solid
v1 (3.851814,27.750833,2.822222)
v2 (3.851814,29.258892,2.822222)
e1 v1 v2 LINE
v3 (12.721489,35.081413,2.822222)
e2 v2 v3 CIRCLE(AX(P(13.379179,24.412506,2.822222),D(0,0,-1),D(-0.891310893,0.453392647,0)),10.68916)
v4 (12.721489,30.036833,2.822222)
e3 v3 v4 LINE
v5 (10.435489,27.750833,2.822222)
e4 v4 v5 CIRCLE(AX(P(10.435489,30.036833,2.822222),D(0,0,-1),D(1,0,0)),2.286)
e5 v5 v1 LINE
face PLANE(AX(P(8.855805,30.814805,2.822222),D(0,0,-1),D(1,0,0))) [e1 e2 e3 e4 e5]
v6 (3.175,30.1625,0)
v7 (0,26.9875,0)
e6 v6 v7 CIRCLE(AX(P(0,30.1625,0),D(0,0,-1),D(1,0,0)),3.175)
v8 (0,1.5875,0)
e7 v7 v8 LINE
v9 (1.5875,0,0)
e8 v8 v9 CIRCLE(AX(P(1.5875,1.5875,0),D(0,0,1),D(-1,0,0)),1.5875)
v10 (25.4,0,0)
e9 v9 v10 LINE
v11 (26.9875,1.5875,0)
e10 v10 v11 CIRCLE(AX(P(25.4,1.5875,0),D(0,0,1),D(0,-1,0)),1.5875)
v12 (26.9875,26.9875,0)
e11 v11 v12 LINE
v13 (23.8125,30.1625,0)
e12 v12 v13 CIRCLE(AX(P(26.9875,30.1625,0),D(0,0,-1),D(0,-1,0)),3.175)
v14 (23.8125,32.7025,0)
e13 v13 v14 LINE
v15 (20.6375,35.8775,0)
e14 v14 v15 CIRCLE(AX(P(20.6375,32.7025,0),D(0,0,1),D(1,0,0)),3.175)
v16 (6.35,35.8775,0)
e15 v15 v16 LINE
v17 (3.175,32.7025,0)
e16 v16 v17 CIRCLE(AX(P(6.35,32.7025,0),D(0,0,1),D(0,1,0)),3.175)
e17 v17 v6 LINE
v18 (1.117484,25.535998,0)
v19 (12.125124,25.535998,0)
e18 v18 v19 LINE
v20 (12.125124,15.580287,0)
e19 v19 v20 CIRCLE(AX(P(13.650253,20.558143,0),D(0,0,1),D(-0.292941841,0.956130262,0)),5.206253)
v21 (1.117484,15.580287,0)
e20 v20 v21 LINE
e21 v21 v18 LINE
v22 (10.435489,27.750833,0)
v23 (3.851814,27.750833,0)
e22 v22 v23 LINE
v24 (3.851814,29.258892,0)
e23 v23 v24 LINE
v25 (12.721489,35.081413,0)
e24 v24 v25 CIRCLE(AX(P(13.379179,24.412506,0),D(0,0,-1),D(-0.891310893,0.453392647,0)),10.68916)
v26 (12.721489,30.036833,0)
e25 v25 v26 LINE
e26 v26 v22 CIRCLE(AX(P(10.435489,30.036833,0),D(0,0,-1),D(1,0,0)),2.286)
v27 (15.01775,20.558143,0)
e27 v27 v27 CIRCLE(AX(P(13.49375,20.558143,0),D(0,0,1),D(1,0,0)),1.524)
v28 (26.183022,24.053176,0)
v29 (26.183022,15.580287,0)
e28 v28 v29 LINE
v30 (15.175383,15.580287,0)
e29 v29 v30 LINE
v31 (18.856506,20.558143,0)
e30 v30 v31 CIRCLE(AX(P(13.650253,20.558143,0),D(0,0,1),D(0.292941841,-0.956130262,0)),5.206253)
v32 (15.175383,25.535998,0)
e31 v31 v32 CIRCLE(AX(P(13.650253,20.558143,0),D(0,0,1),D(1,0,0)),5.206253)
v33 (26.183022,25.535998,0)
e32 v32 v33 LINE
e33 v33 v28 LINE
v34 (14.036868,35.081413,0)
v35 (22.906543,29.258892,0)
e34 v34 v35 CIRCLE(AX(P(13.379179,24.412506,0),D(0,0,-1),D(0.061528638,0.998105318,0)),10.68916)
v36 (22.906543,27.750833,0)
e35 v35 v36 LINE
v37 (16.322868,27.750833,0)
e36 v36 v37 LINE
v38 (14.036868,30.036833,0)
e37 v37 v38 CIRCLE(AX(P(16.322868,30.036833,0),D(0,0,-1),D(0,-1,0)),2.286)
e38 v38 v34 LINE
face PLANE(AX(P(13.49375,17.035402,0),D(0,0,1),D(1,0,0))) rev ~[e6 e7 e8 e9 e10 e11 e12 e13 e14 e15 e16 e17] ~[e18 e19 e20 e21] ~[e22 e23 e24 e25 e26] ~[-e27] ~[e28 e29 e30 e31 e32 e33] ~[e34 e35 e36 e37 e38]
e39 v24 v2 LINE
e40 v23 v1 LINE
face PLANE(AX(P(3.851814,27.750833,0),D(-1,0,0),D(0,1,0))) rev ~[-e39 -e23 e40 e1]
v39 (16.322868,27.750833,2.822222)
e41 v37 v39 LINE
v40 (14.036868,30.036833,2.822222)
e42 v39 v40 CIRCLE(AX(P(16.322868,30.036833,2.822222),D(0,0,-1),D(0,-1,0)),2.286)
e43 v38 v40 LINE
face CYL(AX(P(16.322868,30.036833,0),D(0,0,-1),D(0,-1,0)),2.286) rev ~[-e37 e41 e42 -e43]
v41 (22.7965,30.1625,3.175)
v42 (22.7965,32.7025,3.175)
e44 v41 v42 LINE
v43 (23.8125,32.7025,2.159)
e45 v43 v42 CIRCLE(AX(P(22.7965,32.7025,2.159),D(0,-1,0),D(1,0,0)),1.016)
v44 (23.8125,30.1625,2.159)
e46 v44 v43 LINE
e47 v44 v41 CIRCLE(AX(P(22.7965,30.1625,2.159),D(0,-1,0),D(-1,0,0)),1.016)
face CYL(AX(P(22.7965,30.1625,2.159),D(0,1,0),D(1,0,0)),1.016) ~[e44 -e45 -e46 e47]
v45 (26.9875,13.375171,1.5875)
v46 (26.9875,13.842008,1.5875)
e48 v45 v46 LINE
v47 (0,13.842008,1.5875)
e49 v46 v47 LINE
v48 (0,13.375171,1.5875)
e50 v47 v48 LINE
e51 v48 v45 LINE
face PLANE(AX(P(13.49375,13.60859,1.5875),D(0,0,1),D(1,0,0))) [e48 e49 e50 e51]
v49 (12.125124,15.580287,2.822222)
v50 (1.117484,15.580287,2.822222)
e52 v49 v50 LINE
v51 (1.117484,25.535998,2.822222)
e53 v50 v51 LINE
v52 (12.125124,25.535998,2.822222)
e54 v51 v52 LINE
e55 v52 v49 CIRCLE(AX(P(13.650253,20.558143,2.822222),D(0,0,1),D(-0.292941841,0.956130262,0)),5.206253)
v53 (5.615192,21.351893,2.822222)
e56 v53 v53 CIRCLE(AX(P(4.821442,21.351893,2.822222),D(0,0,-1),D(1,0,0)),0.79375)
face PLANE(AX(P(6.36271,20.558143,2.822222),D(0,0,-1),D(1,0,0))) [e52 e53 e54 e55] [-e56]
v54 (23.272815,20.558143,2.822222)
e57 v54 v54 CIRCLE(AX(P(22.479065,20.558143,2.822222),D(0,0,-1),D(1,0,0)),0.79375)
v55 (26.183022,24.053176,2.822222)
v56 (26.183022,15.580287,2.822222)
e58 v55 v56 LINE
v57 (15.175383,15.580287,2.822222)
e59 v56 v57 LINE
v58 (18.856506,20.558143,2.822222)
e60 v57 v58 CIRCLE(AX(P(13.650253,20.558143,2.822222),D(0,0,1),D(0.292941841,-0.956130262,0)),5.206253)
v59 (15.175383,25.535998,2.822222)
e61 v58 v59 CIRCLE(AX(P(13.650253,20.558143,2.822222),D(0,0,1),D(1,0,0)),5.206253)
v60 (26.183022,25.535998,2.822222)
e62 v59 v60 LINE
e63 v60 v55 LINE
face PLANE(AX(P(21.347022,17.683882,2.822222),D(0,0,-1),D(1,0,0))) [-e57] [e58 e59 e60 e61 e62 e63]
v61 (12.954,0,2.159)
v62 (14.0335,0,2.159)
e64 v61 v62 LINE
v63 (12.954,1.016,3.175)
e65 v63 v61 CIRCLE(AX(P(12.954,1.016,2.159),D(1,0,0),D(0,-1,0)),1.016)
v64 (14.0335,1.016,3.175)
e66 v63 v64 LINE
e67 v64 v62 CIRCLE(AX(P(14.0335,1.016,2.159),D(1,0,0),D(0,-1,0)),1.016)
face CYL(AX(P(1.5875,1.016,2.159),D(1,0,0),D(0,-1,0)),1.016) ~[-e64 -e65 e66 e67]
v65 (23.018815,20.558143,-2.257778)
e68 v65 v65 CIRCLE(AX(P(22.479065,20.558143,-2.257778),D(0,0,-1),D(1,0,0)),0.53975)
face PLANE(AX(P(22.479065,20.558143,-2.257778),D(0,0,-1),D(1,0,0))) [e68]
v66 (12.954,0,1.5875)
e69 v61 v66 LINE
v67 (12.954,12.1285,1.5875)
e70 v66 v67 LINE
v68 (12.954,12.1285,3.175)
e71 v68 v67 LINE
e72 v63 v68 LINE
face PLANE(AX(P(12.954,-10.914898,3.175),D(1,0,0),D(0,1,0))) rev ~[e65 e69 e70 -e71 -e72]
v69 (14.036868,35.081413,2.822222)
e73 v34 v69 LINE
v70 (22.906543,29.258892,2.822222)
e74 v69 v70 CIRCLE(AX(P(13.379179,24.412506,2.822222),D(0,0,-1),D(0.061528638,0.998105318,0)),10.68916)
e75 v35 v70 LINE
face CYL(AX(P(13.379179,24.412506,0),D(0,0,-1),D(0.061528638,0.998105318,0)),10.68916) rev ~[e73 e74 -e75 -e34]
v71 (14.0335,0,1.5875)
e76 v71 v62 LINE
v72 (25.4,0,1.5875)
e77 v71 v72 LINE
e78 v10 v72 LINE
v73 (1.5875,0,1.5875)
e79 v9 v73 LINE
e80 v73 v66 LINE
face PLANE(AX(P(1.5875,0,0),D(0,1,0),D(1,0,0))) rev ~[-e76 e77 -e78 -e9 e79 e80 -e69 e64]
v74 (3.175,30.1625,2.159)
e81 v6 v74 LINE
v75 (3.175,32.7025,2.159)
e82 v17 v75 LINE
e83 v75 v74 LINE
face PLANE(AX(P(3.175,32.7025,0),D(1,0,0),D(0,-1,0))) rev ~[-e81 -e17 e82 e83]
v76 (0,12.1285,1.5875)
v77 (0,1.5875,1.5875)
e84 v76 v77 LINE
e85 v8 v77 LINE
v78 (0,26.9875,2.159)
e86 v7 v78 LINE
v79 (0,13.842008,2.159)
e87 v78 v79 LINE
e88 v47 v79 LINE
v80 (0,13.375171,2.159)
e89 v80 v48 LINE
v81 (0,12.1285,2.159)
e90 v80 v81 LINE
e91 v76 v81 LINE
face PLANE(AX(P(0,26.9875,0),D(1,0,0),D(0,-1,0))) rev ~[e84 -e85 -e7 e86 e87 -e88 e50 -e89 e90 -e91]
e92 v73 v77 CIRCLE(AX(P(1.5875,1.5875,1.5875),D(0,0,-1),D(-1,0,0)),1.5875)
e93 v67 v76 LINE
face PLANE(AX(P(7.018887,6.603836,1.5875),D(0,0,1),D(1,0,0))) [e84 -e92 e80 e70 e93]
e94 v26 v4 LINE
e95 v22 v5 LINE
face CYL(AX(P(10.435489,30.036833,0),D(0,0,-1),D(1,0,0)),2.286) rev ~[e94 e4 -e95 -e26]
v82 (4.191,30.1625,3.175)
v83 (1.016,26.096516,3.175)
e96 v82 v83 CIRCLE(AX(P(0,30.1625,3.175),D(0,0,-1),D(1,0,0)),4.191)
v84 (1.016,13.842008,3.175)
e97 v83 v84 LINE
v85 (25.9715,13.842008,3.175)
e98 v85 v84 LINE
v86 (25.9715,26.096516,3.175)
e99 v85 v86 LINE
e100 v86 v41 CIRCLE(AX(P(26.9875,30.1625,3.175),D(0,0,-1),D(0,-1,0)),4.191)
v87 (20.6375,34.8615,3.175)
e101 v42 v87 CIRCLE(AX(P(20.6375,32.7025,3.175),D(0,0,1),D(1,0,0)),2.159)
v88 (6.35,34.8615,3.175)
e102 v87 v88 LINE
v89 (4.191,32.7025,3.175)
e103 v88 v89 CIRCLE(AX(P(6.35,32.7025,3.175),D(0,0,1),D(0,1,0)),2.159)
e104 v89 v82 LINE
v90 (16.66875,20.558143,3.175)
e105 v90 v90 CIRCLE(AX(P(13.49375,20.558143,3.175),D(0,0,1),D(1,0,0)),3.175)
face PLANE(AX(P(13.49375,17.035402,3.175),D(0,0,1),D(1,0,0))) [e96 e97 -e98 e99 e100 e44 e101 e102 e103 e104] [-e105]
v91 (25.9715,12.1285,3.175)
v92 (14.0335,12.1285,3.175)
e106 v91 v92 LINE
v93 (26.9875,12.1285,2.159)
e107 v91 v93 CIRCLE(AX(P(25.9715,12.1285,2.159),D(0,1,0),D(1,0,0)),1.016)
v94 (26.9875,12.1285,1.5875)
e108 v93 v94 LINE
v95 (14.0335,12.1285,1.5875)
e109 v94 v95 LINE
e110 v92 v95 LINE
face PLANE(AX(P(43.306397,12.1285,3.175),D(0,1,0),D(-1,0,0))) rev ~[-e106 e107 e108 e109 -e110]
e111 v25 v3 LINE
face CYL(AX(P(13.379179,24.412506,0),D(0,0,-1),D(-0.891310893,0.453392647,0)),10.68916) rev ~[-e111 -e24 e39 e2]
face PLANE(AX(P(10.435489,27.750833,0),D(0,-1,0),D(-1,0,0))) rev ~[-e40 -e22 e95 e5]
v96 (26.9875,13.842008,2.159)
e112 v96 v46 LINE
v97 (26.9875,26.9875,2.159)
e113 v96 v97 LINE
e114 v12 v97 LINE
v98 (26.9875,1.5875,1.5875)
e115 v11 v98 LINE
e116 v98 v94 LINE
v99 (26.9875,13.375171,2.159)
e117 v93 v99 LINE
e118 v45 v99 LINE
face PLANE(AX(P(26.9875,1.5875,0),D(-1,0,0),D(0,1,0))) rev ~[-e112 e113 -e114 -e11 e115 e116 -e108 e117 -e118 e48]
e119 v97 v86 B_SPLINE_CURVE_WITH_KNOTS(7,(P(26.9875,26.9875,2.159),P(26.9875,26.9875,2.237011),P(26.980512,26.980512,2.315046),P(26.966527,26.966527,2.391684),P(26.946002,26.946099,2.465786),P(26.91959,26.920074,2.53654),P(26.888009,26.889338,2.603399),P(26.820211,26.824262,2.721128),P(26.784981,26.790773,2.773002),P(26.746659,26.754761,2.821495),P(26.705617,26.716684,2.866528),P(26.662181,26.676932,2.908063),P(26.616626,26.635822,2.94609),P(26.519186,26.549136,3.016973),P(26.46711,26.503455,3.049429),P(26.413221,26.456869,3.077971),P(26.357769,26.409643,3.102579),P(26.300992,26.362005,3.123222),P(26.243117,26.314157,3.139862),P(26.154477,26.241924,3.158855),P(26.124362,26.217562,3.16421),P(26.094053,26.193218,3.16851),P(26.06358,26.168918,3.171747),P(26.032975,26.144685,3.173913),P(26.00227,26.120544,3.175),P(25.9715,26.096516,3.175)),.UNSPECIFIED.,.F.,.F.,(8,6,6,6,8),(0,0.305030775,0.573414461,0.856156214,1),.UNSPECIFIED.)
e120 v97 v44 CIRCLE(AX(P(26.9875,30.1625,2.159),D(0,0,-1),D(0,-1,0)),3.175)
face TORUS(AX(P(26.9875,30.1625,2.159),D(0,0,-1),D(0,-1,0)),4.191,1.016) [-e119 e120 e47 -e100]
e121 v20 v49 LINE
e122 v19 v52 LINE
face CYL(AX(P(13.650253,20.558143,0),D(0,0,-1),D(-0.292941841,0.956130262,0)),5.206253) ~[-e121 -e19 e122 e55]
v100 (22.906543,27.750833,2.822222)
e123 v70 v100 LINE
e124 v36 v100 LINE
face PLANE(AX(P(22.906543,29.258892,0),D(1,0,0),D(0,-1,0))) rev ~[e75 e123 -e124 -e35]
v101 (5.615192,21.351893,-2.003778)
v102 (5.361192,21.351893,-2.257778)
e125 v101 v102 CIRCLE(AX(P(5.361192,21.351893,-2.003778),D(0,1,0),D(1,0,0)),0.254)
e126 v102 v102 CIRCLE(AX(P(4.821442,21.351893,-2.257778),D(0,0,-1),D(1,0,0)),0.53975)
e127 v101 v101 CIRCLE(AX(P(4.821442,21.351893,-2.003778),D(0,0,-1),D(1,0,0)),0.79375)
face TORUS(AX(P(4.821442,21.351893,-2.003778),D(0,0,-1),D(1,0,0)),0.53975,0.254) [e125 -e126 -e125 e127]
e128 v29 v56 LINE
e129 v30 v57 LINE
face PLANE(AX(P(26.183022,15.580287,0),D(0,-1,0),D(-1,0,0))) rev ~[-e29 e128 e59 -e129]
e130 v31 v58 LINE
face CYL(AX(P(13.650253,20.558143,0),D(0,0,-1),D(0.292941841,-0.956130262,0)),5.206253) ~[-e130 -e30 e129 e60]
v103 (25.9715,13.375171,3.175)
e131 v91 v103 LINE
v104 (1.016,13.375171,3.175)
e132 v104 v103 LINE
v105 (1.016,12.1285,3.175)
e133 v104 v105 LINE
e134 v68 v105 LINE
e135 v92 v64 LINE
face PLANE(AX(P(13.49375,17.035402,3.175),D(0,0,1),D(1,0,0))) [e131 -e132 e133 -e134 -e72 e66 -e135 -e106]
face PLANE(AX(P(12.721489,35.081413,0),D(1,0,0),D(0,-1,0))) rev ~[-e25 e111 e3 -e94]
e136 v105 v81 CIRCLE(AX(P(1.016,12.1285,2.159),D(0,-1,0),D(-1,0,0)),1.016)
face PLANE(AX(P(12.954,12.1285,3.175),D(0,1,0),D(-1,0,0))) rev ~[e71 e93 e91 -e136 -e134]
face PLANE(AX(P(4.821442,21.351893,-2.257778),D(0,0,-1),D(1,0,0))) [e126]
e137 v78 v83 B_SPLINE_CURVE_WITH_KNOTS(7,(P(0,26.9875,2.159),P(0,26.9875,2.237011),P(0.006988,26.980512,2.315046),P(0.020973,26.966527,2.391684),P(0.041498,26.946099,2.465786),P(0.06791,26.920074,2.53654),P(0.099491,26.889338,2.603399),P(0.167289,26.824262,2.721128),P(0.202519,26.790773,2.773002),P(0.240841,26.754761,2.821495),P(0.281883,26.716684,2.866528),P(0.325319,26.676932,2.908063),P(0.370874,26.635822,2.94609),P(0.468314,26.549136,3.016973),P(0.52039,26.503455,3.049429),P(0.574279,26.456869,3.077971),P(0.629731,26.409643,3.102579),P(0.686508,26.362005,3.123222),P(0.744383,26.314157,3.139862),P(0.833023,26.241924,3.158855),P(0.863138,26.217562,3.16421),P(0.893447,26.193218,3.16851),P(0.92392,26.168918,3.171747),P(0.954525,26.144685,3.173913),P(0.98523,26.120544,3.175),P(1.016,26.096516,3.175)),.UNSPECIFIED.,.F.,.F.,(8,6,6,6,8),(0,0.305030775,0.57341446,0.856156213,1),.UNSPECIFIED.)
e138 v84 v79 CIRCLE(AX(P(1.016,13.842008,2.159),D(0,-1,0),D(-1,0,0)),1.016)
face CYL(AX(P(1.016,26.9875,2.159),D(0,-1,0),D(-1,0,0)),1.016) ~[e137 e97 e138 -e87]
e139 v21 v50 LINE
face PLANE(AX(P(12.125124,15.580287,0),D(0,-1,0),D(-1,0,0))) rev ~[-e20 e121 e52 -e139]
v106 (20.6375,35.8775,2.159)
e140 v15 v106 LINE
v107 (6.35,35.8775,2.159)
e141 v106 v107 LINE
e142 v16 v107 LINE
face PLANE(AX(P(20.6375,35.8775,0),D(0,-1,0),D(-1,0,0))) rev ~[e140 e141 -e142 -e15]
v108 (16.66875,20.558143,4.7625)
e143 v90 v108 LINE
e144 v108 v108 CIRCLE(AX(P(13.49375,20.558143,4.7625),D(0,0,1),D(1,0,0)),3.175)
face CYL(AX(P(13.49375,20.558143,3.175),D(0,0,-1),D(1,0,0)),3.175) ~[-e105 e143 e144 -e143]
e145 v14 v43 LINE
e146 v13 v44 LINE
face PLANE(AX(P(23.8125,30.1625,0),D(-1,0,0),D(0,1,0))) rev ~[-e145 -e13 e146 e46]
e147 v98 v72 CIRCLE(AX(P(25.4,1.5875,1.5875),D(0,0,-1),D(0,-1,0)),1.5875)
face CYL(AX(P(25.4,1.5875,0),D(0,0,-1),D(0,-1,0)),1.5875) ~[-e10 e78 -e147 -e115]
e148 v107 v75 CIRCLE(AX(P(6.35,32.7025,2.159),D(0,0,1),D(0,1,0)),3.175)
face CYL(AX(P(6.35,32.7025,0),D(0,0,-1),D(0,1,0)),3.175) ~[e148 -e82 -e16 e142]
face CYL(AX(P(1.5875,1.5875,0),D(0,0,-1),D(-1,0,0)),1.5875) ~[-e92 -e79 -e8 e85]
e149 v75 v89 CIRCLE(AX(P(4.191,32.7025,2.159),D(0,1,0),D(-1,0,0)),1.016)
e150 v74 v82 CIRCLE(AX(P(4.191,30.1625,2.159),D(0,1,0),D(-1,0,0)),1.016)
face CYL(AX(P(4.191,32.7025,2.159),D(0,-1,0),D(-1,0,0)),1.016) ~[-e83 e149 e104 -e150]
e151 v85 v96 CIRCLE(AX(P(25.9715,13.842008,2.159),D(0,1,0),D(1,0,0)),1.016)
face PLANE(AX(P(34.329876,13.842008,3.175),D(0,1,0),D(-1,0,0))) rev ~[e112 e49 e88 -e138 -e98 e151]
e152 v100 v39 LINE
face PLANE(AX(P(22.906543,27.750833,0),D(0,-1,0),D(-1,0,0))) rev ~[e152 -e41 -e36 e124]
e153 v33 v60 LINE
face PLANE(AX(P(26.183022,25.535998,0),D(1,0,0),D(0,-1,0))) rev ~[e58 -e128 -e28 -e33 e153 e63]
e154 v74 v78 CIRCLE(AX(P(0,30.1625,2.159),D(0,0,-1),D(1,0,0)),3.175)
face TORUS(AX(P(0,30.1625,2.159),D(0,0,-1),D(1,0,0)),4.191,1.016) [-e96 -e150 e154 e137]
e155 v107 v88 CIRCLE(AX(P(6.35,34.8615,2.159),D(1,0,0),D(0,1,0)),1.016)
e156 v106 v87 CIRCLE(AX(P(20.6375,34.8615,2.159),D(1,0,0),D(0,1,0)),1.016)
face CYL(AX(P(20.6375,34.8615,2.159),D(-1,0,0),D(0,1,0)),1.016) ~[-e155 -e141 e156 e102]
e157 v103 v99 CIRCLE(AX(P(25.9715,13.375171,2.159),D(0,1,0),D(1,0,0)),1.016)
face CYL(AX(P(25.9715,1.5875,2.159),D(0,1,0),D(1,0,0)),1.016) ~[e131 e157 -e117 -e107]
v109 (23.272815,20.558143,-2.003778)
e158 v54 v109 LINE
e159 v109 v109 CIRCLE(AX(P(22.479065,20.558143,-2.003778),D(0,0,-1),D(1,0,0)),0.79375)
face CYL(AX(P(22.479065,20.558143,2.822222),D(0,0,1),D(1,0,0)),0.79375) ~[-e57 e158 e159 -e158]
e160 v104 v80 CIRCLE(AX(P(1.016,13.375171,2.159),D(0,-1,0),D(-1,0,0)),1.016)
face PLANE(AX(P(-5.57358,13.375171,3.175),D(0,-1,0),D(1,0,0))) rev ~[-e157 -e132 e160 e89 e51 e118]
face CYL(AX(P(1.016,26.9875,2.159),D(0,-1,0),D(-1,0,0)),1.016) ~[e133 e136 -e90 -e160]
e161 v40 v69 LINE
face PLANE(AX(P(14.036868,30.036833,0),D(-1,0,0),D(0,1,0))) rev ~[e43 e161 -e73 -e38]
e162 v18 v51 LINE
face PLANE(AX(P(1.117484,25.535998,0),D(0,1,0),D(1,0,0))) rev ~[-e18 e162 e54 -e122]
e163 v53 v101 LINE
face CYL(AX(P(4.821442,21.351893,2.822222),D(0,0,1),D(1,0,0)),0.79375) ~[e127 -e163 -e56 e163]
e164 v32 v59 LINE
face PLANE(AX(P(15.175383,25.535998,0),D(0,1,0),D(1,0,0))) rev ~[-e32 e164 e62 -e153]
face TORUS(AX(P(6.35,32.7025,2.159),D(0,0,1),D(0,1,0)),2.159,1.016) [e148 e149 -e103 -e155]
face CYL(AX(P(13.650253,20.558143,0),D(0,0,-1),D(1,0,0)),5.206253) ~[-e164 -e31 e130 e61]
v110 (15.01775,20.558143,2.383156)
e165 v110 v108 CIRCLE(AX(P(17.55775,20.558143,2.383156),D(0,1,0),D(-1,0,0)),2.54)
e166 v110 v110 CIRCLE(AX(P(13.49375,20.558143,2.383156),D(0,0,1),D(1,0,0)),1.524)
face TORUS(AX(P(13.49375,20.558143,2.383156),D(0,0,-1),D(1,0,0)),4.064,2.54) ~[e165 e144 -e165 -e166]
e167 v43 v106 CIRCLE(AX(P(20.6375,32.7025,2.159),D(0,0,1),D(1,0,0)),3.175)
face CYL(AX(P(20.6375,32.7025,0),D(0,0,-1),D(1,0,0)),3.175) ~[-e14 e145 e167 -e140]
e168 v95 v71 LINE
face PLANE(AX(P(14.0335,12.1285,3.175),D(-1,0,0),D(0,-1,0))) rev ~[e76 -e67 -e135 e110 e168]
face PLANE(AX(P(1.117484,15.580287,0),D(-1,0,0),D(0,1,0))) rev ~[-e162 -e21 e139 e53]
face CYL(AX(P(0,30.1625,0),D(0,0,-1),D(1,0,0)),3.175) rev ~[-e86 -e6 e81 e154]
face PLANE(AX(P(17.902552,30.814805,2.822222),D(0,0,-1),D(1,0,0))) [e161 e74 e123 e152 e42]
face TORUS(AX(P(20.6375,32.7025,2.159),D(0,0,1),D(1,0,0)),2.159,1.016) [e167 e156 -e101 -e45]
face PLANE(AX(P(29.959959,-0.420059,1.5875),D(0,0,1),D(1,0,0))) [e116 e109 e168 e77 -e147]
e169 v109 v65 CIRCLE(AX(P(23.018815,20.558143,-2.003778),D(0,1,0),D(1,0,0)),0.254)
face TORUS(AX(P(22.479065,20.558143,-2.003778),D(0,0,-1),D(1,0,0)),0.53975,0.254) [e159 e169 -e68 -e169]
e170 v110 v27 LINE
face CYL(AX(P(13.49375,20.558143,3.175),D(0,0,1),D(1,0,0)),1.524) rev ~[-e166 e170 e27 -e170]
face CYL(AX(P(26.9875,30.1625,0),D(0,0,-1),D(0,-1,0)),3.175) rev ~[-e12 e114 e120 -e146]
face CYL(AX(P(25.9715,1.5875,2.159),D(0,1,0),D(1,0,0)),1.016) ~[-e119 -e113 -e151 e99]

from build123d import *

# Parameters (mm, degrees)
F1_DEPTH  = 3.175
F2_R      = 1.016
F3_W      = 24.9555
F3_H      = 0.4668365944
F3_W_2    = 8.3583763037
F3_W_3    = 6.5895795759
F4_DEPTH  = 1.5875
F5_R      = 1.524
F6_DEPTH  = 25.4
F5_R_2    = 3.175
F7_DEPTH  = 1.5875
F9_W      = 1.294683665
F9_H      = 1.482822001
F10_DEPTH = 2.8222222222
F11_R     = 0.79375
F12_DEPTH = 5.08
F13_R     = 0.254
F15_DEPTH = 2.8222222222


# Not quite as in the source:
# - a fillet or chamfer that OpenCascade refuses, or shapes differently, is made with other operations: its cross-section is extruded or revolved along the edge and cut away or added


with BuildPart() as f1:
    # F0 (on Top) → F1 (new body)
    with BuildSketch(Plane.XY):
        with BuildLine():
            ThreePointArc((0, 1.5875), (0.4649679849, 0.4649679849), (1.5875, 0))
            Line((1.5875, 0), (25.4, 0))
            ThreePointArc((25.4, 0), (26.5225320151, 0.4649679849), (26.9875, 1.5875))
            Line((26.9875, 1.5875), (26.9875, 26.9875))
            ThreePointArc((26.9875, 26.9875), (24.7424359697, 27.9174359697), (23.8125, 30.1625))
            Line((23.8125, 30.1625), (23.8125, 32.7025))
            ThreePointArc((23.8125, 32.7025), (22.8825640303, 34.9475640303), (20.6375, 35.8775))
            Line((20.6375, 35.8775), (6.35, 35.8775))
            ThreePointArc((6.35, 35.8775), (4.1049359697, 34.9475640303), (3.175, 32.7025))
            Line((3.175, 32.7025), (3.175, 30.1625))
            ThreePointArc((3.175, 30.1625), (2.2450640303, 27.9174359697), (0, 26.9875))
            Line((0, 26.9875), (0, 1.5875))
        make_face()
    extrude(amount=F1_DEPTH)

    # F2
    f2_edges = [f1.edges().sort_by_distance(p)[0] for p in [
        (26.9875, 14.2875, 3.175),
        (3.175, 31.4325, 3.175),
        (2.245064, 27.917436, 3.175),
        (24.742436, 27.917436, 3.175),
        (23.8125, 31.4325, 3.175),
        (22.882564, 34.947564, 3.175),
        (13.49375, 35.8775, 3.175),
        (4.104936, 34.947564, 3.175),
    ]]
    fillet(f2_edges, radius=F2_R)

    # F3 (on face) → F4 (cut)
    with BuildSketch(Plane.XY.offset(3.175)):
        with BuildLine():
            Line((43.3063970949, 12.1285), (25.9715, 12.1285))
            Line((25.9715, 12.1285), (25.9715, 1.5875))
            ThreePointArc((25.9715, 1.5875), (25.8041115254, 1.1833884746), (25.4, 1.016))
            Line((25.4, 1.016), (14.0335, 1.016))
            Line((14.0335, 1.016), (14.0335, -10.401187452))
            Line((14.0335, -10.401187452), (43.3063970949, -10.401187452))
            Line((43.3063970949, -10.401187452), (43.3063970949, 12.1285))
        make_face()
        with BuildLine():
            Line((25.9715, 12.1285), (14.0335, 12.1285))
            Line((14.0335, 12.1285), (14.0335, 1.016))
            Line((14.0335, 1.016), (25.4, 1.016))
            ThreePointArc((25.4, 1.016), (25.8041115254, 1.1833884746), (25.9715, 1.5875))
            Line((25.9715, 1.5875), (25.9715, 12.1285))
        make_face()
        with BuildLine():
            Line((1.5875, 1.016), (12.954, 1.016))
            Line((12.954, 1.016), (12.954, 12.1285))
            Line((12.954, 12.1285), (1.016, 12.1285))
            Line((1.016, 12.1285), (1.016, 1.5875))
            ThreePointArc((1.016, 1.5875), (1.1833884746, 1.1833884746), (1.5875, 1.016))
        make_face()
        with BuildLine():
            Line((12.954, -10.9148975462), (12.954, 1.016))
            Line((12.954, 1.016), (1.5875, 1.016))
            ThreePointArc((1.5875, 1.016), (1.1833884746, 1.1833884746), (1.016, 1.5875))
            Line((1.016, 1.5875), (1.016, 12.1285))
            Line((1.016, 12.1285), (-5.5735795759, 12.1285))
            Line((-5.5735795759, 12.1285), (-5.5735795759, -10.9148975462))
            Line((-5.5735795759, -10.9148975462), (12.954, -10.9148975462))
        make_face()
        with Locations((13.49375, 13.6085897574)):
            Rectangle(F3_W, F3_H)
        with Locations((30.1506881518, 13.6085897574)):
            Rectangle(F3_W_2, F3_H)
        with Locations((-2.2787897879, 13.6085897574)):
            Rectangle(F3_W_3, F3_H)
    extrude(amount=-F4_DEPTH, mode=Mode.SUBTRACT)

    # F5 (on face) → F6 (cut)
    with BuildSketch(Plane.XY.offset(3.175)):
        with Locations((13.49375, 20.5581425011)):
            Circle(F5_R)
    extrude(amount=-F6_DEPTH, mode=Mode.SUBTRACT)

    # F5 (on face) → F7 (join)
    with BuildSketch(Plane.XY.offset(3.175)):
        with Locations((13.49375, 20.5581425011)):
            Circle(F5_R_2)
        with Locations((13.49375, 20.5581425011)):
            Circle(F5_R, mode=Mode.SUBTRACT)
    extrude(amount=F7_DEPTH)

    # F8: fillet of radius 2.54 on 1 edges, made by hand

    # F8_s1 → F8_t2 (revolve, cut)
    with BuildSketch(Plane.XZ.offset(-20.5581425011)):
        with BuildLine():
            ThreePointArc((15.01775, 2.3831557626), (15.4709270559, 3.8311785525), (16.66875, 4.7625))
            Line((16.66875, 4.7625), (15.01775, 4.7625))
            Line((15.01775, 4.7625), (15.01775, 2.3831557626))
        make_face()
    revolve(axis=Axis((13.49375, 20.5581425011, 4.7625), (0, 0, 1)), mode=Mode.SUBTRACT)

    # F9 (on face) → F10 (cut)
    with BuildSketch(Plane(origin=(0, 0, 0), x_dir=(1, 0, 0), z_dir=(0, 0, -1))):
        with BuildLine():
            ThreePointArc((15.1753826067, -15.5802866697), (17.8362583784, -17.462592513), (18.8565061088, -20.5581425011))
            Line((18.8565061088, -20.5581425011), (26.1830221862, -20.5581425011))
            Line((26.1830221862, -20.5581425011), (26.1830221862, -15.5802866697))
            Line((26.1830221862, -15.5802866697), (15.1753826067, -15.5802866697))
        make_face()
        with BuildLine():
            Line((26.1830221862, -20.5581425011), (18.8565061088, -20.5581425011))
            ThreePointArc((18.8565061088, -20.5581425011), (17.8362583784, -23.6536924892), (15.1753826067, -25.5359983325))
            Line((15.1753826067, -25.5359983325), (24.8883385211, -25.5359983325))
            Line((24.8883385211, -25.5359983325), (24.8883385211, -24.0531763315))
            Line((24.8883385211, -24.0531763315), (26.1830221862, -24.0531763315))
            Line((26.1830221862, -24.0531763315), (26.1830221862, -20.5581425011))
        make_face()
        with Locations((25.5356803536, -24.794587332)):
            Rectangle(F9_W, F9_H)
        with BuildLine():
            Line((12.1251240555, -15.5802866697), (1.117484476, -15.5802866697))
            Line((1.117484476, -15.5802866697), (1.117484476, -20.5581425011))
            Line((1.117484476, -20.5581425011), (1.117484476, -25.5359983325))
            Line((1.117484476, -25.5359983325), (12.1251240555, -25.5359983325))
            ThreePointArc((12.1251240555, -25.5359983325), (8.4440005534, -20.5581425011), (12.1251240555, -15.5802866697))
        make_face()
    extrude(amount=-F10_DEPTH, mode=Mode.SUBTRACT)

    # F11 (on face) → F12 (join)
    with BuildSketch(Plane(origin=(0, 0, 2.8222222222), x_dir=(1, 0, 0), z_dir=(0, 0, -1))):
        with Locations((22.4790647626, -20.5581425011)):
            Circle(F11_R)
        with Locations((4.8214418996, -21.3518925011)):
            Circle(F11_R)
    extrude(amount=F12_DEPTH)

    # F13
    f13_edges = [f1.edges().sort_by_distance(p)[0] for p in [
        (21.685315, 20.558143, -2.257778),
        (4.027692, 21.351893, -2.257778),
    ]]
    fillet(f13_edges, radius=F13_R)

    # F14 (on face) → F15 (cut)
    with BuildSketch(Plane(origin=(0, 0, 0), x_dir=(1, 0, 0), z_dir=(0, 0, -1))):
        with BuildLine():
            Line((10.4354891836, -27.7508334085), (3.8518141955, -27.7508334085))
            Line((3.8518141955, -27.7508334085), (3.8518141955, -29.2588919401))
            ThreePointArc((3.8518141955, -29.2588919401), (7.5132373167, -33.3483248509), (12.7214891836, -35.0814126432))
            Line((12.7214891836, -35.0814126432), (12.7214891836, -30.0368334085))
            ThreePointArc((12.7214891836, -30.0368334085), (12.0519352854, -28.4203873067), (10.4354891836, -27.7508334085))
        make_face()
        with BuildLine():
            ThreePointArc((14.0368680542, -35.0814126432), (19.2451199211, -33.3483248509), (22.9065430423, -29.2588919401))
            Line((22.9065430423, -29.2588919401), (22.9065430423, -27.7508334085))
            Line((22.9065430423, -27.7508334085), (16.3228680542, -27.7508334085))
            ThreePointArc((16.3228680542, -27.7508334085), (14.7064219524, -28.4203873067), (14.0368680542, -30.0368334085))
            Line((14.0368680542, -30.0368334085), (14.0368680542, -35.0814126432))
        make_face()
    extrude(amount=-F15_DEPTH, mode=Mode.SUBTRACT)


solid = f1.part
